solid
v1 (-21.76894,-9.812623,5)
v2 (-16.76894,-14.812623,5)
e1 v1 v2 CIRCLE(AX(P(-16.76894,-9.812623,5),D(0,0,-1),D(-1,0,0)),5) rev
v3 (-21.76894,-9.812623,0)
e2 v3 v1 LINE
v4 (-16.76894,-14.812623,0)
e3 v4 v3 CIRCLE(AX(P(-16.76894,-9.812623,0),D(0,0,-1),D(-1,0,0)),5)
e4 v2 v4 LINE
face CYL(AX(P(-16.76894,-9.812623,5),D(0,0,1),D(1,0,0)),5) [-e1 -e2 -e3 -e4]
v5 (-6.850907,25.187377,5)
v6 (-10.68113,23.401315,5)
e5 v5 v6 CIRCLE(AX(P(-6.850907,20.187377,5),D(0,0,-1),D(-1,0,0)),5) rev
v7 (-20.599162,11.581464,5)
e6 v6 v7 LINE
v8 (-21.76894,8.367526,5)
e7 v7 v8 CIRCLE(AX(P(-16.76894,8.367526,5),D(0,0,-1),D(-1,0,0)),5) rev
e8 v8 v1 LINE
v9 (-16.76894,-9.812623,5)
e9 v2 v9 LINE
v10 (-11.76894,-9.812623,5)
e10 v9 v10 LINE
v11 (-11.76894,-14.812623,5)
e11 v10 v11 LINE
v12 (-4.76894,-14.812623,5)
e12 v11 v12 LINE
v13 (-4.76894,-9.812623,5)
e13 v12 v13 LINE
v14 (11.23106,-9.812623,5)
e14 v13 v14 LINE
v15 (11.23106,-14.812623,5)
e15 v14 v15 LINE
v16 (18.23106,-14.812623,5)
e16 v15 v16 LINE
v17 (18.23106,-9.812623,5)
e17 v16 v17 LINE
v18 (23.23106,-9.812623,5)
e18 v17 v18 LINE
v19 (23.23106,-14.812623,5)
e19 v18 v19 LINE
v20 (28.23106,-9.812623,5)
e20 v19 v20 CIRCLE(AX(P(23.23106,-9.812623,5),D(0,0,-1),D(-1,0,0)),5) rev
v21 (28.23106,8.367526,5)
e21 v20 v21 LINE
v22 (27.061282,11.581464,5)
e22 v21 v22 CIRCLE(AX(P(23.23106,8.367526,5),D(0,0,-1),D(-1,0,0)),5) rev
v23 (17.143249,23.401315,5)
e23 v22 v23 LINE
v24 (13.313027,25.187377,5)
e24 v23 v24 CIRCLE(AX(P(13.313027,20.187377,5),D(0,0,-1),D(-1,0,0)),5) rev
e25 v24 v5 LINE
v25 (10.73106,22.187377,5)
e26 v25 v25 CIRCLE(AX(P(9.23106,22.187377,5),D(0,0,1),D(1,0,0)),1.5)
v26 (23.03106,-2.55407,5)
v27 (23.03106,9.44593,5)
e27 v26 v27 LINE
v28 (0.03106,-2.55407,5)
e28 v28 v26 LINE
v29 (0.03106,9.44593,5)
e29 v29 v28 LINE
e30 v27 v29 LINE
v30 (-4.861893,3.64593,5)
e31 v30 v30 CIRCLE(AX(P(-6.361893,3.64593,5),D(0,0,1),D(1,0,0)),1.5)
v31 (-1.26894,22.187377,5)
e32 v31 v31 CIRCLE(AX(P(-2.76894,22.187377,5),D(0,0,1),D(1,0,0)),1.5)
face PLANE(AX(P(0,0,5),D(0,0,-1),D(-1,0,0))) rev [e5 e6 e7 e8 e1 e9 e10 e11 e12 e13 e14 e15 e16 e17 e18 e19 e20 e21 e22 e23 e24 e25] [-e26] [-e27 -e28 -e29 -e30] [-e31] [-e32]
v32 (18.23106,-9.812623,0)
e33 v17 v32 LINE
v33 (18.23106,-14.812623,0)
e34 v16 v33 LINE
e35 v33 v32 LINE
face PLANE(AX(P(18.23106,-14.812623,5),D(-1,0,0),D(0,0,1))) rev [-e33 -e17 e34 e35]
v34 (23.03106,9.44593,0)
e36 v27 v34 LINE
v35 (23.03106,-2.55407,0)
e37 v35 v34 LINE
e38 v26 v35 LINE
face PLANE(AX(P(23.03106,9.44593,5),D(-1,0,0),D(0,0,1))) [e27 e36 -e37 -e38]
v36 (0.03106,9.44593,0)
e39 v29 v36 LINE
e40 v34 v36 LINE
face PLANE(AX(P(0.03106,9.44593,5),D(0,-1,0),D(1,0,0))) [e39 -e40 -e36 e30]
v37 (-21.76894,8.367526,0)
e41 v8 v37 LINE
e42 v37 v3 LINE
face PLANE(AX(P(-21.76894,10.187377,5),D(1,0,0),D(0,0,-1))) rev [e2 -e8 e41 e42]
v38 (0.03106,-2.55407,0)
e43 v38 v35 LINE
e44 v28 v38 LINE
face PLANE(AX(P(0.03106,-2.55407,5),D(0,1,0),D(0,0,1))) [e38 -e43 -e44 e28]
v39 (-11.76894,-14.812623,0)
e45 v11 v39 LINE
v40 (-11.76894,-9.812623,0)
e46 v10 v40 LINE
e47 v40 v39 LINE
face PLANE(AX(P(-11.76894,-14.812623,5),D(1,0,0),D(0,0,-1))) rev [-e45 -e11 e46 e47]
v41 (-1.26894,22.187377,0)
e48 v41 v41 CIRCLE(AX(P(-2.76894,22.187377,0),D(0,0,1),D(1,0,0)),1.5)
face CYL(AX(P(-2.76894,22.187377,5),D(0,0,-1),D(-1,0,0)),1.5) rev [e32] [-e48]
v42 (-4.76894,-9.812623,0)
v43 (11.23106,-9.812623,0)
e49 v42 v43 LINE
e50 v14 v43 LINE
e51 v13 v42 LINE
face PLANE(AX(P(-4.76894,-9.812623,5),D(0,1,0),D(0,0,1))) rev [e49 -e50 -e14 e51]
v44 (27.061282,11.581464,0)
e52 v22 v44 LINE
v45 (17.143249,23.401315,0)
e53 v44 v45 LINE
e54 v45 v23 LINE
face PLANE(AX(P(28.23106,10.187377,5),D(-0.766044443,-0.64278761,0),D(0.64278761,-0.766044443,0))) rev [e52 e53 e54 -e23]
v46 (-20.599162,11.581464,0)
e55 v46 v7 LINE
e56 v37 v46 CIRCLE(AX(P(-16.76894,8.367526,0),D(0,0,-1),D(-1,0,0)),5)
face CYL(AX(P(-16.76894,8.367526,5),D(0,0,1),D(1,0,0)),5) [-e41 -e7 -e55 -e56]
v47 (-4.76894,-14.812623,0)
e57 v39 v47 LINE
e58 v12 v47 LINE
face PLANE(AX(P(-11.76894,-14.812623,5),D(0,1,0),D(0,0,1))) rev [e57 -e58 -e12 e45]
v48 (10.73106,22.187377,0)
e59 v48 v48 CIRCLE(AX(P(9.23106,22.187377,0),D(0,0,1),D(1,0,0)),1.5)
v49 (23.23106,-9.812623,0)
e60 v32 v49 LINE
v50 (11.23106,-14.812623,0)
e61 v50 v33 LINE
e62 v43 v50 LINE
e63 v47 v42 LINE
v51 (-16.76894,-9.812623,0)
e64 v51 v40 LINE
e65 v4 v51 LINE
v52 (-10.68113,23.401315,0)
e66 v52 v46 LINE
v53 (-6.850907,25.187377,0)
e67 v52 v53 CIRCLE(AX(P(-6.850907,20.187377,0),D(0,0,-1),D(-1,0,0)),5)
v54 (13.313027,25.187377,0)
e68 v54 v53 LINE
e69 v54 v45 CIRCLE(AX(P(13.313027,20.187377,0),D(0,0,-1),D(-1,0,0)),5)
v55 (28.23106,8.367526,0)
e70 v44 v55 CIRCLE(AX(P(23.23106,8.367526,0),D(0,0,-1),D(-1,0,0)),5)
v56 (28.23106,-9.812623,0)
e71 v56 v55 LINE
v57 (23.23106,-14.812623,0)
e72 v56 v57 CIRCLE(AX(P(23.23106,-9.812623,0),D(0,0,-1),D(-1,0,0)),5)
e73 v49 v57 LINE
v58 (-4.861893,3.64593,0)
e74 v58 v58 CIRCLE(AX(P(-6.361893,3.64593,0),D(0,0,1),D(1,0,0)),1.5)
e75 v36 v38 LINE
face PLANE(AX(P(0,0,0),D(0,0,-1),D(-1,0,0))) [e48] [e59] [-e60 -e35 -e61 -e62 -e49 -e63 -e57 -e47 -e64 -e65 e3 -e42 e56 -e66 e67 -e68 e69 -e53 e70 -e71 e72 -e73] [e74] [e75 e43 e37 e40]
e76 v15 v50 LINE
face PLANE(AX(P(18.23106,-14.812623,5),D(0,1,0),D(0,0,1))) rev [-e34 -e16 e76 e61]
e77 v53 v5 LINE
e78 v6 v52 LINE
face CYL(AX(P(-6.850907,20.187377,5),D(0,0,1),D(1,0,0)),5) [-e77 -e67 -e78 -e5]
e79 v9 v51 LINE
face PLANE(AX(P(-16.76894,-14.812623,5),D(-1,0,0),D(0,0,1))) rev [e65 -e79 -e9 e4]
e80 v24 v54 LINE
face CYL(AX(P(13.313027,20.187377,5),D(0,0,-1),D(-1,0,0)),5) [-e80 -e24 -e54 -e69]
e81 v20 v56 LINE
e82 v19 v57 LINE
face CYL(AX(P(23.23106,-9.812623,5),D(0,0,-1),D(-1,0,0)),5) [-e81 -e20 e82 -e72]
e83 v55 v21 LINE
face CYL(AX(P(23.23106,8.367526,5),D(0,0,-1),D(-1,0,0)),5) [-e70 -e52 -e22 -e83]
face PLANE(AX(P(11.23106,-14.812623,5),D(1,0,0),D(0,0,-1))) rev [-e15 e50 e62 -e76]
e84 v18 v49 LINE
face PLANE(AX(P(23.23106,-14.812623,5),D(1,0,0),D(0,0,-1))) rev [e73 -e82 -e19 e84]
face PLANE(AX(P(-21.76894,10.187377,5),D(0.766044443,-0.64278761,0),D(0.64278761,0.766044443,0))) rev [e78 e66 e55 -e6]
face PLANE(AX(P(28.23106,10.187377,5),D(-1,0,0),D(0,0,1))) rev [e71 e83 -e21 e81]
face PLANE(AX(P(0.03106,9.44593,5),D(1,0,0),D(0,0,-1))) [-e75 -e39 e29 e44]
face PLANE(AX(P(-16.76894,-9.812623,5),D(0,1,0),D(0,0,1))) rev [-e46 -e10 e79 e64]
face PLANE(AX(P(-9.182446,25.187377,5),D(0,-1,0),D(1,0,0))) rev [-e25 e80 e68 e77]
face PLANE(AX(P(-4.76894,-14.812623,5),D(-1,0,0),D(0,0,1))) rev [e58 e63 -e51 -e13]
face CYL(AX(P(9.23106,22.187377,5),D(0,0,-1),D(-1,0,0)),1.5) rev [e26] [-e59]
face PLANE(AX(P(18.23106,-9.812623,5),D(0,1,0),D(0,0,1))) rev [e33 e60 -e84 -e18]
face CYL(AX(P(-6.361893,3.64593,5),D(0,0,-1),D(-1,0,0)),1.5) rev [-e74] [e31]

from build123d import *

# Parameters (mm, degrees)
SKETCH1_R           = 1.5
SKETCH1_W           = 23
SKETCH1_H           = 12
BOSS_EXTRUDE1_DEPTH = 5
FILLET1_R           = 5
FILLET2_R           = 5
FILLET3_R           = 5
FILLET4_R           = 5
FILLET5_R           = 5
FILLET6_R           = 5


with BuildPart() as part:
    # Sketch1 → Boss-Extrude1 (new body)
    with BuildSketch(Plane.XY):
        Polygon((28.231059773, 10.187376726), (15.644565305, 25.187376726), (-9.182445759, 25.187376726), (-21.768940227, 10.187376726), (-21.768940227, -14.812623274), (-16.768940227, -14.812623274), (-16.768940227, -9.812623274), (-11.768940227, -9.812623274), (-11.768940227, -14.812623274), (-4.768940227, -14.812623274), (-4.768940227, -9.812623274), (11.231059773, -9.812623274), (11.231059773, -14.812623274), (18.231059773, -14.812623274), (18.231059773, -9.812623274), (23.231059773, -9.812623274), (23.231059773, -14.812623274), (28.231059773, -14.812623274), align=None)
        with Locations((-2.768940227, 22.187376726)):
            Circle(SKETCH1_R, mode=Mode.SUBTRACT)
        with Locations((9.231059773, 22.187376726)):
            Circle(SKETCH1_R, mode=Mode.SUBTRACT)
        with Locations((-6.361893004, 3.645929715)):
            Circle(SKETCH1_R, mode=Mode.SUBTRACT)
        with Locations((11.531059773, 3.445929715)):
            Rectangle(SKETCH1_W, SKETCH1_H, mode=Mode.SUBTRACT)
    extrude(amount=BOSS_EXTRUDE1_DEPTH)

    # Fillet1
    fillet1_edges = [part.edges().sort_by_distance(p)[0] for p in [
        (15.644565305, 25.187376726, 2.5),
    ]]
    fillet(fillet1_edges, radius=FILLET1_R)

    # Fillet2
    fillet2_edges = [part.edges().sort_by_distance(p)[0] for p in [
        (28.231059773, 10.187376726, 2.5),
    ]]
    fillet(fillet2_edges, radius=FILLET2_R)

    # Fillet3
    fillet3_edges = [part.edges().sort_by_distance(p)[0] for p in [
        (28.231059773, -14.812623274, 2.5),
    ]]
    fillet(fillet3_edges, radius=FILLET3_R - 0.0001)  # a hair under: the kernel refuses the full size

    # Fillet4
    fillet4_edges = [part.edges().sort_by_distance(p)[0] for p in [
        (-9.182445759, 25.187376726, 2.5),
    ]]
    fillet(fillet4_edges, radius=FILLET4_R)

    # Fillet5
    fillet5_edges = [part.edges().sort_by_distance(p)[0] for p in [
        (-21.768940227, 10.187376726, 2.5),
    ]]
    fillet(fillet5_edges, radius=FILLET5_R)

    # Fillet6
    fillet6_edges = [part.edges().sort_by_distance(p)[0] for p in [
        (-21.768940227, -14.812623274, 2.5),
    ]]
    fillet(fillet6_edges, radius=FILLET6_R - 0.0001)  # a hair under: the kernel refuses the full size


solid = part.part
